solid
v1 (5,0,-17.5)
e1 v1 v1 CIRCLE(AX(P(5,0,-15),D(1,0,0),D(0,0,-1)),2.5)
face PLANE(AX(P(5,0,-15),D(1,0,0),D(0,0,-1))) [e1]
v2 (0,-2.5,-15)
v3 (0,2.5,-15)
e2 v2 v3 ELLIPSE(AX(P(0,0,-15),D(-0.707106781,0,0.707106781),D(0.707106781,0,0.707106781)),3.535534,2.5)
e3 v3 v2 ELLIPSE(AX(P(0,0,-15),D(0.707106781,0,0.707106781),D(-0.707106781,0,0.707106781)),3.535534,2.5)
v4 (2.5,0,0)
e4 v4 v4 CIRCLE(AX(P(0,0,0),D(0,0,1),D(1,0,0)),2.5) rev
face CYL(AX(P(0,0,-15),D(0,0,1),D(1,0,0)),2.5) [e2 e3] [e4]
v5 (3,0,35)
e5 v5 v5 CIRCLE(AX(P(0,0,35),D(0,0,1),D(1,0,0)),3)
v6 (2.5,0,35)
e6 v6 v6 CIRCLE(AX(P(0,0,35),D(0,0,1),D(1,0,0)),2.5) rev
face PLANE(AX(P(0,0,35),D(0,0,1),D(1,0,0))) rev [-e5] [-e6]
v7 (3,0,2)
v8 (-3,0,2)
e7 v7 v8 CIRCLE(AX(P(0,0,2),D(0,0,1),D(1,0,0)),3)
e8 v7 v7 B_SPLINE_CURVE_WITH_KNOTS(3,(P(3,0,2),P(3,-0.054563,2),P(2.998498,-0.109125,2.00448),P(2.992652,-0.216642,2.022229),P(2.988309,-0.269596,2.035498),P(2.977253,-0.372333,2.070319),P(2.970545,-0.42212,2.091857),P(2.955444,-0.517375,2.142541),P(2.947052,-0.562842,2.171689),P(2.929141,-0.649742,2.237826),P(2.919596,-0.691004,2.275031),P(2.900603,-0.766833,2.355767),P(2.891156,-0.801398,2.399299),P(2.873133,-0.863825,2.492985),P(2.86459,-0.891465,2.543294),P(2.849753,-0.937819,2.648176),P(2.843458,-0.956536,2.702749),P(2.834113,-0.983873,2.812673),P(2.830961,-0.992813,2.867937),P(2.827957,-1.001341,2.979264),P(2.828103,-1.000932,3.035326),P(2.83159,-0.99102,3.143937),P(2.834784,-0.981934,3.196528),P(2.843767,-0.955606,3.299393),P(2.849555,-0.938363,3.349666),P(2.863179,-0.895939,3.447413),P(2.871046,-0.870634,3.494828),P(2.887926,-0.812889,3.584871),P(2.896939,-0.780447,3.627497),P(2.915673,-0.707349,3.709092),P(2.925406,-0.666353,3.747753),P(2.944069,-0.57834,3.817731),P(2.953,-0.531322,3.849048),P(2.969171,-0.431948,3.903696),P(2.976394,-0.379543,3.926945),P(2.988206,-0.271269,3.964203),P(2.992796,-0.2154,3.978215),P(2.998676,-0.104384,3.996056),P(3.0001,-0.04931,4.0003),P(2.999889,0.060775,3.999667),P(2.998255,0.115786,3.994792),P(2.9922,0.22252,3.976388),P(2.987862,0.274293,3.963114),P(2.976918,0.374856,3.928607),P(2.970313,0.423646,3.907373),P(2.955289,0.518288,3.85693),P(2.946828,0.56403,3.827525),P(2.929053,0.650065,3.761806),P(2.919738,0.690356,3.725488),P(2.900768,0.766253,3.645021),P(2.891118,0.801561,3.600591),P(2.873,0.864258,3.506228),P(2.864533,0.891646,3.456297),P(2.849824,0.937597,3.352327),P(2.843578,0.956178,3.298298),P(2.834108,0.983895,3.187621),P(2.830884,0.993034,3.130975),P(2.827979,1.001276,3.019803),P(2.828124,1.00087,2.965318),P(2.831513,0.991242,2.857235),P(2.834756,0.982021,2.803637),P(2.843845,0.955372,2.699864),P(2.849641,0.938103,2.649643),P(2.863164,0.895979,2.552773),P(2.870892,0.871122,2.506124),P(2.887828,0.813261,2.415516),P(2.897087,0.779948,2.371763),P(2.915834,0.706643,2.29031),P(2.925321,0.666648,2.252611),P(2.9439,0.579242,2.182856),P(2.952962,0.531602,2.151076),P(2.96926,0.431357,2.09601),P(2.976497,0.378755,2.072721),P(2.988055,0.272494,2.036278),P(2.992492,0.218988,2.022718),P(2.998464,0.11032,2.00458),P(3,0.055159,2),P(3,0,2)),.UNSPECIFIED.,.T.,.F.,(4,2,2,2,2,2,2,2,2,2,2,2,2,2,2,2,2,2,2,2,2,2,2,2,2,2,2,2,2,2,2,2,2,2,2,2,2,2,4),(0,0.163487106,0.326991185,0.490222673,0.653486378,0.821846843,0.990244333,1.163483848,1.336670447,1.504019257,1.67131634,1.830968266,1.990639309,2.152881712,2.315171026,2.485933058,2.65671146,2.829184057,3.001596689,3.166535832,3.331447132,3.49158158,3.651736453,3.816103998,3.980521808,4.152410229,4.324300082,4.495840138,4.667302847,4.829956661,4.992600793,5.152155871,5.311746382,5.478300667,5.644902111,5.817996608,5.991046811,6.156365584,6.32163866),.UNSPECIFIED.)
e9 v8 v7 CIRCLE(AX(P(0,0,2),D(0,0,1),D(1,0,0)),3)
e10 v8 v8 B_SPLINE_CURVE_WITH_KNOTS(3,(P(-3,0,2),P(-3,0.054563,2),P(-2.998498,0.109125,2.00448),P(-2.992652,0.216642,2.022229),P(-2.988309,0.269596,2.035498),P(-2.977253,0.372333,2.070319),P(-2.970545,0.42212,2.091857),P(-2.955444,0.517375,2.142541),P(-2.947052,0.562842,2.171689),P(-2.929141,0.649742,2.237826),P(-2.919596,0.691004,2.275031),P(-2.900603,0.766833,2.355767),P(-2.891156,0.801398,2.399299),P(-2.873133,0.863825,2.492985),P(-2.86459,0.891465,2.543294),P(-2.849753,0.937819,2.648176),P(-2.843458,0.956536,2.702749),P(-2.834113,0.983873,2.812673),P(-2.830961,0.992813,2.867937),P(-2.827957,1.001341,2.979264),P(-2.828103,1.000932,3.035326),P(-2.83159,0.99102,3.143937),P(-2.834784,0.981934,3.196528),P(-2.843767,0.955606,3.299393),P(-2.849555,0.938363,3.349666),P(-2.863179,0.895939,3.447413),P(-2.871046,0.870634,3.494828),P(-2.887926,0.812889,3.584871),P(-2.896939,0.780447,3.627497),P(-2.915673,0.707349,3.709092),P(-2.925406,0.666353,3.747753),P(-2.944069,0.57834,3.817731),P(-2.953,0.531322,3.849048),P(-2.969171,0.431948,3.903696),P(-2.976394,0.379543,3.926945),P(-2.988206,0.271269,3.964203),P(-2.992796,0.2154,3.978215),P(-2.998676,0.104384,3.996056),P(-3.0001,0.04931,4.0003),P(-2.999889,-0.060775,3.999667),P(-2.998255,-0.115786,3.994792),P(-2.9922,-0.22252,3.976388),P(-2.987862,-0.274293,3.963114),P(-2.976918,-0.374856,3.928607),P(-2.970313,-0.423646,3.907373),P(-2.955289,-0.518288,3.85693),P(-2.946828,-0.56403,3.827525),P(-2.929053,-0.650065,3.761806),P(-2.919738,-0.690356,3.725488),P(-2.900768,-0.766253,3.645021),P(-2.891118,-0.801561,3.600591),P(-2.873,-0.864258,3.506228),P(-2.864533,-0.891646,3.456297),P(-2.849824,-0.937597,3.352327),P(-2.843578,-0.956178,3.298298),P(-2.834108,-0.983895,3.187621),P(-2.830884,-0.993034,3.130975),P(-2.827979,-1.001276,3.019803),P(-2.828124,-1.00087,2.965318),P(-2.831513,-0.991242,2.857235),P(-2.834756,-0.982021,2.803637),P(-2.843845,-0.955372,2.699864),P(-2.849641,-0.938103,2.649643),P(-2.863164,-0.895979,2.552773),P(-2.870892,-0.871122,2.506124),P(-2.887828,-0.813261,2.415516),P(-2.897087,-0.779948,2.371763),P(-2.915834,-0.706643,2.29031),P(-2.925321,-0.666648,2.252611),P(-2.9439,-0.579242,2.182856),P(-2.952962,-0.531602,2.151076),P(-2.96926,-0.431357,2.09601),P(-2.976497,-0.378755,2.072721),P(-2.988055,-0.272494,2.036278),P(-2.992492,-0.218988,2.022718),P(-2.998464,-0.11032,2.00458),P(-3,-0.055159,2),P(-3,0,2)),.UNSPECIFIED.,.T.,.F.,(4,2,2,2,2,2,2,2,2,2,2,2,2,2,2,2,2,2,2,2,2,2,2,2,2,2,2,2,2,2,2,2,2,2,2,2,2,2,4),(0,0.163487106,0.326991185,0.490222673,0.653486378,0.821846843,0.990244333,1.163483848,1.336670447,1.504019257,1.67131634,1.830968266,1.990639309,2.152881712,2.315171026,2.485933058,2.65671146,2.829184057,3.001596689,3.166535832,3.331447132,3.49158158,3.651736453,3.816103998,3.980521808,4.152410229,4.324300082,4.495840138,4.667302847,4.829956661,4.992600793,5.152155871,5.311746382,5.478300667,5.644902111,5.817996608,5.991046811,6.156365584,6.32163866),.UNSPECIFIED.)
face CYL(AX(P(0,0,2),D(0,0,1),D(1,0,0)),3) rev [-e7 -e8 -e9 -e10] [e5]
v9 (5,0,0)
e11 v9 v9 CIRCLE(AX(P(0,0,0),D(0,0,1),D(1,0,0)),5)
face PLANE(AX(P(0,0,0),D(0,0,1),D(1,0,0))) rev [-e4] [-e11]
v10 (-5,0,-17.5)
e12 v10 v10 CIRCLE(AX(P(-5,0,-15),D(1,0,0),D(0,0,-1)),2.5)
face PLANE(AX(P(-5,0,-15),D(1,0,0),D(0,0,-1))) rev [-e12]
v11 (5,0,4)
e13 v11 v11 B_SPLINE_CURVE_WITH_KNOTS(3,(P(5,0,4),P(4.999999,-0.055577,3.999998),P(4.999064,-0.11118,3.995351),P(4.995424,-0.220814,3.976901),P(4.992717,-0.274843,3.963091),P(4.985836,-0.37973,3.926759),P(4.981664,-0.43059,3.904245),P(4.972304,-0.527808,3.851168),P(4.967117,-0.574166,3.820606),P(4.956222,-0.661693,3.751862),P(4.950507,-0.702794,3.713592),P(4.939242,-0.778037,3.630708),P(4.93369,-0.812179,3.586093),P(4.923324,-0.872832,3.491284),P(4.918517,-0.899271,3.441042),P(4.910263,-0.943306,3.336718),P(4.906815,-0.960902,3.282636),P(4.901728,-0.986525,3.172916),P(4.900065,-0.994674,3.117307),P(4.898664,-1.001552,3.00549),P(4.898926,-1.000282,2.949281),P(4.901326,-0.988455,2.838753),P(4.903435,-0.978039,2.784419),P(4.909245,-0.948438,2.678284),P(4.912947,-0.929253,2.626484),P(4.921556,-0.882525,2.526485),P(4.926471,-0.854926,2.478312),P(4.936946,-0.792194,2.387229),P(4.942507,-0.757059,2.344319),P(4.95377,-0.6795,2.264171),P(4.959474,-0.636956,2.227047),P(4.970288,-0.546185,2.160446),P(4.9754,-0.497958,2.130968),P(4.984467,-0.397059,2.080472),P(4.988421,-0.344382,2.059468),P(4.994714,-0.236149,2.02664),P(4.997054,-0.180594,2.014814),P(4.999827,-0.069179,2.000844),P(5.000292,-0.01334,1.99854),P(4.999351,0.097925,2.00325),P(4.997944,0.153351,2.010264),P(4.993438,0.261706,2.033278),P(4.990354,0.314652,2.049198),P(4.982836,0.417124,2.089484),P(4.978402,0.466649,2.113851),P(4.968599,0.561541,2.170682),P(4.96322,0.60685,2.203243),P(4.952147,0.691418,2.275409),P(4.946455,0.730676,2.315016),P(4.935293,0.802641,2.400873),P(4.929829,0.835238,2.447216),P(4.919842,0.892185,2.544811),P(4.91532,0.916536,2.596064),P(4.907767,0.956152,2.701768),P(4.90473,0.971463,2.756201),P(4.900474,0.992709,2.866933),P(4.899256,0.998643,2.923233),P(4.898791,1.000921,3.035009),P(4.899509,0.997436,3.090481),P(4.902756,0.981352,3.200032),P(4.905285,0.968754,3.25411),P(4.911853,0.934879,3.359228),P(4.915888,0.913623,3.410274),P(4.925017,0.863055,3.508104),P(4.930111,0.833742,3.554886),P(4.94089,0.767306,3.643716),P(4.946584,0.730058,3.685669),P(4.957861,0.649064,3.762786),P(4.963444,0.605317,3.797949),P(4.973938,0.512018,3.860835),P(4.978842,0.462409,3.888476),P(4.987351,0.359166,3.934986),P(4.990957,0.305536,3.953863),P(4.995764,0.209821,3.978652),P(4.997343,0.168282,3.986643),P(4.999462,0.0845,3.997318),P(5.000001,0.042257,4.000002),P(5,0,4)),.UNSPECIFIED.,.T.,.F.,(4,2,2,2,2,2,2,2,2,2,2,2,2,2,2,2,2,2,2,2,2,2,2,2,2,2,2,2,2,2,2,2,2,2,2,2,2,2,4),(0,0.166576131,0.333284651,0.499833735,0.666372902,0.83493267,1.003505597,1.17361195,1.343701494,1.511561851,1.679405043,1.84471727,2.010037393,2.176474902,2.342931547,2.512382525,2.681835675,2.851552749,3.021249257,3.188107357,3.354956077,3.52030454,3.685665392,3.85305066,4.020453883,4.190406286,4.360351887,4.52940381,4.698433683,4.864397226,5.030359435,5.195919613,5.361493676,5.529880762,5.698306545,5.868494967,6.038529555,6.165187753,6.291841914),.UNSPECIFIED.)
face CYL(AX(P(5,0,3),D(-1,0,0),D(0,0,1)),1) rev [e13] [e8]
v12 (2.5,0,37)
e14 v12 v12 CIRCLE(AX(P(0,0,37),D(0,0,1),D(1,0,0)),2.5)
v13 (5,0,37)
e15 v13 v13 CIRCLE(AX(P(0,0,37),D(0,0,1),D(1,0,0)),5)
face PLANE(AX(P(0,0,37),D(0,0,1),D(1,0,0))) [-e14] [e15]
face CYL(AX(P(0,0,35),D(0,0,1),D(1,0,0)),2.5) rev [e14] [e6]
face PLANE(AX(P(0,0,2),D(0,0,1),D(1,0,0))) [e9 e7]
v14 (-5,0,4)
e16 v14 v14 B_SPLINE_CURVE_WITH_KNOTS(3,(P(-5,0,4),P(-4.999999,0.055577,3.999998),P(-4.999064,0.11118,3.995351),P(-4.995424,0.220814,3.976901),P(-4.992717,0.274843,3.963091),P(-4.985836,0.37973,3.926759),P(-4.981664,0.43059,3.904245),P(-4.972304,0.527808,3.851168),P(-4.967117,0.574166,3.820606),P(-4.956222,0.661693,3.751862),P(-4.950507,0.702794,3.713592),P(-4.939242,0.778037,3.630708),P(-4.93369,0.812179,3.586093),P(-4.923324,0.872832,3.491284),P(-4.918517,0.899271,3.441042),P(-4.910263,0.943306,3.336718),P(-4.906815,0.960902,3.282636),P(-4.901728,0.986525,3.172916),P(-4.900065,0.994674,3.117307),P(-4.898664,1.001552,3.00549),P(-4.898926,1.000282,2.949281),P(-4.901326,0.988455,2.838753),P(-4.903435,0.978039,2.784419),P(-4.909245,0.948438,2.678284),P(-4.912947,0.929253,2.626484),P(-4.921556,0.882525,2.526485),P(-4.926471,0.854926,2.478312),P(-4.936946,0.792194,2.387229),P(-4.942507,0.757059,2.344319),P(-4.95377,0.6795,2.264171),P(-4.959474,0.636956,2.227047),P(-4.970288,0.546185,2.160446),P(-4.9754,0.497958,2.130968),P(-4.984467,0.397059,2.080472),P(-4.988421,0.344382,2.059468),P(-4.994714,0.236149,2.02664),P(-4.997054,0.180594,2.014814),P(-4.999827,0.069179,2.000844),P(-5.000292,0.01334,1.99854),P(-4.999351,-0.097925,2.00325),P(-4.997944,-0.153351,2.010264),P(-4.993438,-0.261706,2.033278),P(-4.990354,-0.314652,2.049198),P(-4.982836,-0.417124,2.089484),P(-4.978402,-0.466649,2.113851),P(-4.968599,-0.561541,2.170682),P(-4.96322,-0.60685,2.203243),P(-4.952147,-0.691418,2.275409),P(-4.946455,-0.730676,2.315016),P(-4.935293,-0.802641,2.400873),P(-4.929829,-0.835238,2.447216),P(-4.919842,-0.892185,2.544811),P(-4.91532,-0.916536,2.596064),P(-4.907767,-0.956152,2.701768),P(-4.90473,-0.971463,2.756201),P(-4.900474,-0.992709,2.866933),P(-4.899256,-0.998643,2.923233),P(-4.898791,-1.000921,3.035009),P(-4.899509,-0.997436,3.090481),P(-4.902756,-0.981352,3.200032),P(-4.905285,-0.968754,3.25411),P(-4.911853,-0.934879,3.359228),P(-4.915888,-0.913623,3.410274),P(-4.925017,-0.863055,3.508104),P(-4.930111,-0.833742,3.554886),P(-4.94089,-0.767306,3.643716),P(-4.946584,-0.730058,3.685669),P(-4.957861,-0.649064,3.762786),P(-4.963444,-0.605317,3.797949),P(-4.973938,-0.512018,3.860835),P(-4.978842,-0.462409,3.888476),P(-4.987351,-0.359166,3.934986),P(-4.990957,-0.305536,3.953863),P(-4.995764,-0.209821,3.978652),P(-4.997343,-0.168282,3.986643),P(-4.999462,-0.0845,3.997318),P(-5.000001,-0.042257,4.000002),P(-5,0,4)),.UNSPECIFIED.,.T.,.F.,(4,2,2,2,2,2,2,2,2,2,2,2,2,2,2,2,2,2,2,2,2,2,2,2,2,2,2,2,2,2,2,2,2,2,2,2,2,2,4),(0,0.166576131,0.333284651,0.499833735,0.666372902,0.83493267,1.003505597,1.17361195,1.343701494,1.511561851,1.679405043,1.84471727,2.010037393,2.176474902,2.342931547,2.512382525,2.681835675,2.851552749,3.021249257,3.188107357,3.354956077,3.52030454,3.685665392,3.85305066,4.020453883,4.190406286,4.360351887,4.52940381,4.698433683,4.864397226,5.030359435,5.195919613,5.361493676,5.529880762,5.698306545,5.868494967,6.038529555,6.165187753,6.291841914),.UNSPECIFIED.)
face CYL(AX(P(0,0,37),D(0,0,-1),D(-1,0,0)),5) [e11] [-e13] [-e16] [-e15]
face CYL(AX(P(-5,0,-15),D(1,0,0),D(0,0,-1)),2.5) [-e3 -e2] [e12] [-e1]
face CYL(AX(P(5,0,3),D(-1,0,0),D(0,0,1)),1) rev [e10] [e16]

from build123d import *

# Parameters (mm, degrees)
SKETCH1_R                = 5
BOSS_EXTRUDE1_DEPTH      = 37
SKETCH2_R                = 2.5
CUT_EXTRUDE1_DEPTH       = 2
SKETCH3_R                = 3
CUT_EXTRUDE2_DEPTH       = 33
CUT_EXTRUDE3_START       = -5.000000101
CUT_EXTRUDE3_OUTLINE_R   = 1
CUT_EXTRUDE3_DEPTH       = 10.000000201
SKETCH4_R                = 2.5
BOSS_EXTRUDE2_DEPTH      = 15
BOSS_EXTRUDE3_DEPTH      = 5
BOSS_EXTRUDE3_DEPTH_BACK = 5
SKETCH5_R                = 2.5


# Read off the part's stored shape, not the designer's step: Cut-Extrude3
with BuildPart() as part:
    # Sketch1 → Boss-Extrude1 (new body)
    with BuildSketch(Plane.XY):
        Circle(SKETCH1_R)
    extrude(amount=BOSS_EXTRUDE1_DEPTH)

    # Sketch2 → Cut-Extrude1 (cut)
    with BuildSketch(Plane.XY.offset(37)):
        Circle(SKETCH2_R)
    extrude(amount=-CUT_EXTRUDE1_DEPTH, mode=Mode.SUBTRACT)

    # Sketch3 → Cut-Extrude2 (cut)
    with BuildSketch(Plane.XY.offset(35)):
        Circle(SKETCH3_R)
    extrude(amount=-CUT_EXTRUDE2_DEPTH, mode=Mode.SUBTRACT)

    # Cut-Extrude3 outline → Cut-Extrude3 (cut)
    with BuildSketch(Plane.YZ.offset(CUT_EXTRUDE3_START)):
        with Locations((0, 3)):
            Circle(CUT_EXTRUDE3_OUTLINE_R)
    extrude(amount=CUT_EXTRUDE3_DEPTH, mode=Mode.SUBTRACT)

    # Sketch4 → Boss-Extrude2 (add)
    with BuildSketch(Plane(origin=(0, 0, 0), x_dir=(-1, 0, 0), z_dir=(0, 0, -1))):
        with Locations(Location((0, 0, 0), (0, 0, 180))):
            Circle(SKETCH4_R)
    extrude(amount=BOSS_EXTRUDE2_DEPTH)

    # Sketch5 → Boss-Extrude3 (add, two sides: drawn at the far end of the back side and taken through both)
    with BuildSketch(Plane(origin=(0, 0, 0), x_dir=(0, 0, -1), z_dir=(1, 0, 0)).offset(-BOSS_EXTRUDE3_DEPTH_BACK)):
        with Locations((15, 0)):
            Circle(SKETCH5_R)
    extrude(amount=BOSS_EXTRUDE3_DEPTH + BOSS_EXTRUDE3_DEPTH_BACK)


solid = part.part
